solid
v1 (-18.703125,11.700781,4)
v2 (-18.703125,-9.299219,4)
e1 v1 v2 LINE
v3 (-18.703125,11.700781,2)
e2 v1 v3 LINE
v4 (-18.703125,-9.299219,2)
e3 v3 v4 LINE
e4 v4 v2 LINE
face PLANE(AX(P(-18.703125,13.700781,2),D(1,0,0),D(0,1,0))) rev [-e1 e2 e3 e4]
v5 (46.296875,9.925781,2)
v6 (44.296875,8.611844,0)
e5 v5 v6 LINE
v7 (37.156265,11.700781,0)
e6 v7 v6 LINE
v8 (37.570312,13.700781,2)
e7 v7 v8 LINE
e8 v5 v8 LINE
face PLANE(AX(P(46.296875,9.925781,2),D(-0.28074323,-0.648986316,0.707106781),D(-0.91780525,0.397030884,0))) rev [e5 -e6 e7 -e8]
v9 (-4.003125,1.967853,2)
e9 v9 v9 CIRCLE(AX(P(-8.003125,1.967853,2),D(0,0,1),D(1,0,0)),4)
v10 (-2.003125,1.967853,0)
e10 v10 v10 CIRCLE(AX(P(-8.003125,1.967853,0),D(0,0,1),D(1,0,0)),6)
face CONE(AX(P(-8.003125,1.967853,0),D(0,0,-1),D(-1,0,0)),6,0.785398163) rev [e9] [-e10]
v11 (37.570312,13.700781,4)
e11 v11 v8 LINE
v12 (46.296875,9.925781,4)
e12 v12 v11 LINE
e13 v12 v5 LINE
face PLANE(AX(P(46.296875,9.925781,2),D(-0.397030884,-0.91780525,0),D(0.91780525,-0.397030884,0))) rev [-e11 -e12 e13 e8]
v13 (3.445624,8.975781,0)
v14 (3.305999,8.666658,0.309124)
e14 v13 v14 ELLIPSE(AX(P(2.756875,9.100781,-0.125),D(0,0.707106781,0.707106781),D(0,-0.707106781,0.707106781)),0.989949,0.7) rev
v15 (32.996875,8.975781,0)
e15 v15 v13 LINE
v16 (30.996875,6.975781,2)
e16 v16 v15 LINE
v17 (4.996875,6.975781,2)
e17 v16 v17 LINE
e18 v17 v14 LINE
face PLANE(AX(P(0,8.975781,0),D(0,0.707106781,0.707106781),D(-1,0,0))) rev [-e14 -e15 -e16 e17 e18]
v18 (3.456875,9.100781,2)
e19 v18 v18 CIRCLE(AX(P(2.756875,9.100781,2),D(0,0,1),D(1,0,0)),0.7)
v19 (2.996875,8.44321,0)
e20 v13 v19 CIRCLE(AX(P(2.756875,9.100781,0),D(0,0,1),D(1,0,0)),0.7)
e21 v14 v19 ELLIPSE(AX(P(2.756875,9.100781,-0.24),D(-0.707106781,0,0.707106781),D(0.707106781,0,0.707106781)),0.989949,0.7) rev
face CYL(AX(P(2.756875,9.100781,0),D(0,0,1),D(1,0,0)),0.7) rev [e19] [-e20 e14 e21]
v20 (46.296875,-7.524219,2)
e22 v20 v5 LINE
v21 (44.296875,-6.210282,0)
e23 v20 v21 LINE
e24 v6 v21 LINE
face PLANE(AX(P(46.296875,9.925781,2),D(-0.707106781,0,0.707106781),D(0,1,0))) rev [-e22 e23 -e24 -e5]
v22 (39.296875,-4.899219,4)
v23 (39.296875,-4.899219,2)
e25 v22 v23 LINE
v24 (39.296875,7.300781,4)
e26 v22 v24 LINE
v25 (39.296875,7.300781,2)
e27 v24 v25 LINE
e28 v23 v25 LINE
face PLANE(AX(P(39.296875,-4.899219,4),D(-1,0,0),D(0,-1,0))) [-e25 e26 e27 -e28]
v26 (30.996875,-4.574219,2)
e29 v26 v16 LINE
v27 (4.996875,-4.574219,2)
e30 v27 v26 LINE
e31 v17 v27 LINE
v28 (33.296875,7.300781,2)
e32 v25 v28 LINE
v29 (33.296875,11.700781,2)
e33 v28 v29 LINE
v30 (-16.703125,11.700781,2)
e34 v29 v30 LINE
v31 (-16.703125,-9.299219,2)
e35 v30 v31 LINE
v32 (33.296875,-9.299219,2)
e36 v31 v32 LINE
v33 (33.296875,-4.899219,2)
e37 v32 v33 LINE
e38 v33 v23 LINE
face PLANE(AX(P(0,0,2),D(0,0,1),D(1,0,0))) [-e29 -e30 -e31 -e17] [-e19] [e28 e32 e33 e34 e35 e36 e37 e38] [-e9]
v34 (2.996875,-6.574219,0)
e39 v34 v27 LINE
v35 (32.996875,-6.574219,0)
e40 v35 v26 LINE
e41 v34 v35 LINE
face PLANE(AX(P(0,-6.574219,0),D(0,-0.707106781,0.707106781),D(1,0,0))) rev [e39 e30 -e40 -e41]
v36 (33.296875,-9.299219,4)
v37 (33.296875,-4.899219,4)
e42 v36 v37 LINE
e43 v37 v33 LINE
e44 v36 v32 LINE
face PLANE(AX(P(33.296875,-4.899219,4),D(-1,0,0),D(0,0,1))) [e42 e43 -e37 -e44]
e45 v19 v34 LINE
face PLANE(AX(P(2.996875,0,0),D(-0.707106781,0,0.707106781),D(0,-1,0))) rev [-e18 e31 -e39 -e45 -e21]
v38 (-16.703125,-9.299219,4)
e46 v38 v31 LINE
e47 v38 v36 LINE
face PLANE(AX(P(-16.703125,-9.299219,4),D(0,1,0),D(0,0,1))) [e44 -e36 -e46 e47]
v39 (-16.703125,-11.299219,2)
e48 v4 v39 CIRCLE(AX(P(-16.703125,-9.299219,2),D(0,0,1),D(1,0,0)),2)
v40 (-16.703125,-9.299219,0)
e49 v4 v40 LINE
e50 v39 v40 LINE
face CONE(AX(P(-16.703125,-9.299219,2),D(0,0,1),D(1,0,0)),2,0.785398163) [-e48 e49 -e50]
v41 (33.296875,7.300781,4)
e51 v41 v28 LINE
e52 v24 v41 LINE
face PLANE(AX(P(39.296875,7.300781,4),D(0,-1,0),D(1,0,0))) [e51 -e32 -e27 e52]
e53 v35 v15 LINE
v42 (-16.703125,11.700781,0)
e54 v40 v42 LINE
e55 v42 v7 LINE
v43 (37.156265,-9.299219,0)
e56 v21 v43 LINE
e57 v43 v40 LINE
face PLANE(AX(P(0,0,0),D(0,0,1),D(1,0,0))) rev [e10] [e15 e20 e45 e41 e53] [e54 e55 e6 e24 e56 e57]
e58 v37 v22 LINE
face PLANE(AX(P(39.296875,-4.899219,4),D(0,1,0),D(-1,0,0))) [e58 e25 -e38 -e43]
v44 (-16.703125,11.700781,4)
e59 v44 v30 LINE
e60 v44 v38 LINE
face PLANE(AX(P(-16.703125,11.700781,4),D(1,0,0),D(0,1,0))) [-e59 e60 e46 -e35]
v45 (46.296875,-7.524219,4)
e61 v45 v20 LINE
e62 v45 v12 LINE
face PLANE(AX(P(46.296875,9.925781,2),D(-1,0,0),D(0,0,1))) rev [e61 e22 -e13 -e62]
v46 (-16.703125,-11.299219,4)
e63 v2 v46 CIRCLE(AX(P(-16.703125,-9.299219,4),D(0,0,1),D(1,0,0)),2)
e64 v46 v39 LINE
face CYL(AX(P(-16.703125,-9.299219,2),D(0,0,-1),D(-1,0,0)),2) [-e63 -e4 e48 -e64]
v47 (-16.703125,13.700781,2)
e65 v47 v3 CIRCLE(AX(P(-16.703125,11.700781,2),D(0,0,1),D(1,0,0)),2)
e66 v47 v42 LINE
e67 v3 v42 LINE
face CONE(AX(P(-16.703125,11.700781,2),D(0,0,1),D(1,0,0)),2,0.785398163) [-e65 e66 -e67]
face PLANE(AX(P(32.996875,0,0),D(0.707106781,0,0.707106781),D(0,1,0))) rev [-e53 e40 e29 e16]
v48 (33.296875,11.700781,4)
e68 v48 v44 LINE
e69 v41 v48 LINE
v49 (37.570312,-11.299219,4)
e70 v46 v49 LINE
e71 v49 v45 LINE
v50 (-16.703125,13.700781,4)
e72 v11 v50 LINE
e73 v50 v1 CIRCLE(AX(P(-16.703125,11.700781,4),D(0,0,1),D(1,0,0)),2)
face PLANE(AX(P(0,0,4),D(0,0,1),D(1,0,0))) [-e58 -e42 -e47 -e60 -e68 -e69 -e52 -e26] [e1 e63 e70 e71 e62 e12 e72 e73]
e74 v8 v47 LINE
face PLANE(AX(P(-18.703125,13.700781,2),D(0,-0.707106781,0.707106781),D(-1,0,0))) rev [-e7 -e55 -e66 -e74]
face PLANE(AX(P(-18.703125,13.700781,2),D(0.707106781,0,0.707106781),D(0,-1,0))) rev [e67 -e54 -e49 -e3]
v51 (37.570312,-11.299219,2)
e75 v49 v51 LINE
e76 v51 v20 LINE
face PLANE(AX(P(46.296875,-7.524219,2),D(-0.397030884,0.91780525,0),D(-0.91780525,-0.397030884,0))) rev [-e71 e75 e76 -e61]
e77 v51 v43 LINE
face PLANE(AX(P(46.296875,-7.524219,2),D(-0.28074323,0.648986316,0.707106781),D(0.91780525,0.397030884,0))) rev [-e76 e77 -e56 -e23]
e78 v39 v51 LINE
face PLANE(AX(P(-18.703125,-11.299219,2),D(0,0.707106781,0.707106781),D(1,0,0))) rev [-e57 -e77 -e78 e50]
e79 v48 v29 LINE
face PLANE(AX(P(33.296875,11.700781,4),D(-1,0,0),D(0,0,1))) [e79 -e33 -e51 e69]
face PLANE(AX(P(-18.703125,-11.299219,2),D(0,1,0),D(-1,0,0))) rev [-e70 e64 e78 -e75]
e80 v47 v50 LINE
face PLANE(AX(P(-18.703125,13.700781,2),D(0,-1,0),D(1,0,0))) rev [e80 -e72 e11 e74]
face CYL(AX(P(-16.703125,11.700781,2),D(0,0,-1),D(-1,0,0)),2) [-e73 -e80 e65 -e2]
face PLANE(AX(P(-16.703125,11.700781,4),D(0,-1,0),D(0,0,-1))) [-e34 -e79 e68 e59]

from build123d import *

# Parameters (mm, degrees)
EXTRUDE_1_DEPTH     = 2
EXTRUDE_2_DEPTH     = 2
SKETCH_4_R          = 4
SKETCH_4_R_2        = 0.7
SKETCH_4_W          = 26
SKETCH_4_H          = 11.55
CUT_EXTRUDE_1_DEPTH = 49.322997027
CHAMFER_3_SIZE      = 2
FILLET_2_R          = 2
CHAMFER_4_SIZE      = 2


# Some blends are built 0.0001 mm under size
with BuildPart() as part:
    # Эскиз1 → Бобышка-Вытянуть1 (new body)
    with BuildSketch(Plane.XY):
        Polygon((46.296875, 9.92578125), (37.5703125, 13.70078125), (-18.703125, 13.70078125), (-18.703125, -11.29921875), (37.5703125, -11.29921875), (46.296875, -7.52421875), align=None)
    extrude(amount=EXTRUDE_1_DEPTH)

    # Эскиз2 → Бобышка-Вытянуть2 (add)
    with BuildSketch(Plane.XY.offset(2)):
        Polygon((-18.703125, -11.29921875), (37.5703125, -11.29921875), (46.296875, -7.52421875), (46.296875, 9.92578125), (37.5703125, 13.70078125), (-18.703125, 13.70078125), align=None)
        Polygon((-16.703125, 11.70078125), (33.296875, 11.70078125), (33.296875, 7.30078125), (39.296875, 7.30078125), (39.296875, -4.89921875), (33.296875, -4.89921875), (33.296875, -9.29921875), (-16.703125, -9.29921875), align=None, mode=Mode.SUBTRACT)
    extrude(amount=EXTRUDE_2_DEPTH)

    # Эскиз4 → Вырез-Вытянуть1 (cut, through all)
    with BuildSketch(Plane.XY.offset(2)):
        with Locations((-8.003125, 1.96785345)):
            Circle(SKETCH_4_R)
        with Locations((2.756875, 9.10078125)):
            Circle(SKETCH_4_R_2)
        with Locations((17.996875, 1.20078125)):
            Rectangle(SKETCH_4_W, SKETCH_4_H)
    extrude(amount=-CUT_EXTRUDE_1_DEPTH, mode=Mode.SUBTRACT)

    # Фаска3
    # the kernel refuses this chamfer: 2 mm, written as the material it takes off along each edge
    with BuildSketch(Plane(origin=(51.017483297, 7.883706112, 0), x_dir=(0.010916712185249174, 0.025235859914990173, 0.9996219169112968), z_dir=(-0.9178052503070296, 0.3970308835705994, 0))) as chamfer_3_piece_1:
        Polygon((CHAMFER_3_SIZE * 0.999621916911, -CHAMFER_3_SIZE * 0.0274958766106), (-CHAMFER_3_SIZE * 0.0274958766106, -CHAMFER_3_SIZE * 0.999621916911), (0, 0), align=None)
    extrude(amount=19.794808417, mode=Mode.SUBTRACT)
    with BuildSketch(Plane(origin=(46.296875, -12.667584726, 0), x_dir=(0.02749587661058563, 0, 0.9996219169112968), z_dir=(0, 1, 0))) as chamfer_3_piece_2:
        Polygon((CHAMFER_3_SIZE * 0.999621916911, -CHAMFER_3_SIZE * 0.0274958766106), (-CHAMFER_3_SIZE * 0.0274958766106, -CHAMFER_3_SIZE * 0.999621916911), (0, 0), align=None)
    extrude(amount=27.736731952, mode=Mode.SUBTRACT)
    with BuildSketch(Plane(origin=(32.849704203, -13.341293888, 0), x_dir=(-0.3968807729078274, 0.9174582436631658, -0.027495876610586396), z_dir=(0.91780525030703, 0.3970308835705984, 0))) as chamfer_3_piece_3:
        Polygon((CHAMFER_3_SIZE * 0.999621916911, CHAMFER_3_SIZE * 0.0274958766106), (-CHAMFER_3_SIZE * 0.0274958766106, CHAMFER_3_SIZE * 0.999621916911), (0, 0), align=None)
    extrude(amount=19.794808417, mode=Mode.SUBTRACT)
    with BuildSketch(Plane(origin=(-8.003125, 1.96785345, 0), x_dir=(1, 0, 0), z_dir=(0, -1, 0))) as chamfer_3_piece_4:
        Polygon((4 + CHAMFER_3_SIZE, 0), (4, CHAMFER_3_SIZE), (4, 0), align=None)
    revolve(axis=Axis((-8.003125, 1.96785345, 0), (0, 0, 1)), mode=Mode.SUBTRACT)
    with BuildSketch(Plane(origin=(30.996875, 6.97578125, 0), x_dir=(0.9996219169112968, 0, -0.02749587661058632), z_dir=(0, -1, 0)), Plane(origin=(4.996875, -4.57421875, 0), x_dir=(-0.9996219169112968, 0, -0.027495876610586372), z_dir=(0, 1, 0))) as chamfer_3_piece_5:
        Polygon((CHAMFER_3_SIZE * 0.999621916911, CHAMFER_3_SIZE * 0.0274958766106), (-CHAMFER_3_SIZE * 0.0274958766106, CHAMFER_3_SIZE * 0.999621916911), (0, 0), align=None)
    extrude(amount=11.55, mode=Mode.SUBTRACT)
    with BuildSketch(Plane(origin=(30.996875, -4.57421875, 0), x_dir=(0, -0.9996219169112968, -0.027495876610586365), z_dir=(-1, 0, 0)), Plane(origin=(4.996875, 6.97578125, 0), x_dir=(0, 0.9996219169112968, -0.027495876610586348), z_dir=(1, 0, 0))) as chamfer_3_piece_6:
        Polygon((CHAMFER_3_SIZE * 0.999621916911, CHAMFER_3_SIZE * 0.0274958766106), (-CHAMFER_3_SIZE * 0.0274958766106, CHAMFER_3_SIZE * 0.999621916911), (0, 0), align=None)
    extrude(amount=26, mode=Mode.SUBTRACT)
    with BuildSketch(Plane(origin=(30.996875, 12.119147226, 0), x_dir=(0.9996219169112968, 0, -0.02749587661058632), z_dir=(0, -1, 0))) as chamfer_3_piece_7a_section:
        Polygon((CHAMFER_3_SIZE * 0.999621916911, CHAMFER_3_SIZE * 0.0274958766106), (-CHAMFER_3_SIZE * 0.0274958766106, CHAMFER_3_SIZE * 0.999621916911), (0, 0), align=None)
    chamfer_3_piece_7a = extrude(amount=16.693365976, mode=Mode.PRIVATE)
    chamfer_3_piece_7a = split(chamfer_3_piece_7a, bisect_by=Plane(origin=(31.656462254, 6.97578125, 0.659587254), z_dir=(0, 1, 0)), keep=Keep.TOP, mode=Mode.PRIVATE)
    with BuildSketch(Plane(origin=(4.996875, 6.97578125, 0), x_dir=(0, 0.9996219169112968, -0.027495876610586348), z_dir=(1, 0, 0))) as chamfer_3_piece_7b_section:
        Polygon((CHAMFER_3_SIZE * 0.999621916911, CHAMFER_3_SIZE * 0.0274958766106), (-CHAMFER_3_SIZE * 0.0274958766106, CHAMFER_3_SIZE * 0.999621916911), (0, 0), align=None)
    chamfer_3_piece_7b = extrude(amount=31.143365976, mode=Mode.PRIVATE)
    chamfer_3_piece_7b = split(chamfer_3_piece_7b, bisect_by=Plane(origin=(30.996875, 7.635368504, 0.659587254), z_dir=(1, 0, 0)), keep=Keep.TOP, mode=Mode.PRIVATE)
    chamfer_3_piece_7 = chamfer_3_piece_7a & chamfer_3_piece_7b
    add(chamfer_3_piece_7, mode=Mode.SUBTRACT)
    with BuildSketch(Plane(origin=(36.140240976, -4.57421875, 0), x_dir=(0, -0.9996219169112968, -0.027495876610586365), z_dir=(-1, 0, 0))) as chamfer_3_piece_8a_section:
        Polygon((CHAMFER_3_SIZE * 0.999621916911, CHAMFER_3_SIZE * 0.0274958766106), (-CHAMFER_3_SIZE * 0.0274958766106, CHAMFER_3_SIZE * 0.999621916911), (0, 0), align=None)
    chamfer_3_piece_8a = extrude(amount=31.143365976, mode=Mode.PRIVATE)
    chamfer_3_piece_8a = split(chamfer_3_piece_8a, bisect_by=Plane(origin=(30.996875, -5.233806004, 0.659587254), z_dir=(1, 0, 0)), keep=Keep.TOP, mode=Mode.PRIVATE)
    with BuildSketch(Plane(origin=(30.996875, 6.97578125, 0), x_dir=(0.9996219169112968, 0, -0.02749587661058632), z_dir=(0, -1, 0))) as chamfer_3_piece_8b_section:
        Polygon((CHAMFER_3_SIZE * 0.999621916911, CHAMFER_3_SIZE * 0.0274958766106), (-CHAMFER_3_SIZE * 0.0274958766106, CHAMFER_3_SIZE * 0.999621916911), (0, 0), align=None)
    chamfer_3_piece_8b = extrude(amount=16.693365976, mode=Mode.PRIVATE)
    chamfer_3_piece_8b = split(chamfer_3_piece_8b, bisect_by=Plane(origin=(31.656462254, -4.57421875, 0.659587254), z_dir=(0, -1, 0)), keep=Keep.TOP, mode=Mode.PRIVATE)
    chamfer_3_piece_8 = chamfer_3_piece_8a & chamfer_3_piece_8b
    add(chamfer_3_piece_8, mode=Mode.SUBTRACT)
    with BuildSketch(Plane(origin=(4.996875, -9.717584726, 0), x_dir=(-0.9996219169112968, 0, -0.027495876610586355), z_dir=(0, 1, 0))) as chamfer_3_piece_9a_section:
        Polygon((CHAMFER_3_SIZE * 0.999621916911, CHAMFER_3_SIZE * 0.0274958766106), (-CHAMFER_3_SIZE * 0.0274958766106, CHAMFER_3_SIZE * 0.999621916911), (0, 0), align=None)
    chamfer_3_piece_9a = extrude(amount=16.693365976, mode=Mode.PRIVATE)
    chamfer_3_piece_9a = split(chamfer_3_piece_9a, bisect_by=Plane(origin=(4.337287746, -4.57421875, 0.659587254), z_dir=(0, -1, 0)), keep=Keep.TOP, mode=Mode.PRIVATE)
    with BuildSketch(Plane(origin=(30.996875, -4.57421875, 0), x_dir=(0, -0.9996219169112968, -0.027495876610586365), z_dir=(-1, 0, 0))) as chamfer_3_piece_9b_section:
        Polygon((CHAMFER_3_SIZE * 0.999621916911, CHAMFER_3_SIZE * 0.0274958766106), (-CHAMFER_3_SIZE * 0.0274958766106, CHAMFER_3_SIZE * 0.999621916911), (0, 0), align=None)
    chamfer_3_piece_9b = extrude(amount=31.143365976, mode=Mode.PRIVATE)
    chamfer_3_piece_9b = split(chamfer_3_piece_9b, bisect_by=Plane(origin=(4.996875, -5.233806004, 0.659587254), z_dir=(-1, 0, 0)), keep=Keep.TOP, mode=Mode.PRIVATE)
    chamfer_3_piece_9 = chamfer_3_piece_9a & chamfer_3_piece_9b
    add(chamfer_3_piece_9, mode=Mode.SUBTRACT)
    with BuildSketch(Plane(origin=(4.996875, -4.57421875, 0), x_dir=(-0.9996219169112968, 0, -0.027495876610586372), z_dir=(0, 1, 0))) as chamfer_3_piece_10a_section:
        Polygon((CHAMFER_3_SIZE * 0.999621916911, CHAMFER_3_SIZE * 0.0274958766106), (-CHAMFER_3_SIZE * 0.0274958766106, CHAMFER_3_SIZE * 0.999621916911), (0, 0), align=None)
    chamfer_3_piece_10a = extrude(amount=16.693365976, mode=Mode.PRIVATE)
    chamfer_3_piece_10a = split(chamfer_3_piece_10a, bisect_by=Plane(origin=(4.337287746, 6.97578125, 0.659587254), z_dir=(0, 1, 0)), keep=Keep.TOP, mode=Mode.PRIVATE)
    with BuildSketch(Plane(origin=(-0.146490976, 6.97578125, 0), x_dir=(0, 0.9996219169112968, -0.027495876610586348), z_dir=(1, 0, 0))) as chamfer_3_piece_10b_section:
        Polygon((CHAMFER_3_SIZE * 0.999621916911, CHAMFER_3_SIZE * 0.0274958766106), (-CHAMFER_3_SIZE * 0.0274958766106, CHAMFER_3_SIZE * 0.999621916911), (0, 0), align=None)
    chamfer_3_piece_10b = extrude(amount=31.143365976, mode=Mode.PRIVATE)
    chamfer_3_piece_10b = split(chamfer_3_piece_10b, bisect_by=Plane(origin=(4.996875, 7.635368504, 0.659587254), z_dir=(-1, 0, 0)), keep=Keep.TOP, mode=Mode.PRIVATE)
    chamfer_3_piece_10 = chamfer_3_piece_10a & chamfer_3_piece_10b
    add(chamfer_3_piece_10, mode=Mode.SUBTRACT)

    # Скругление2
    fillet_2_edges = [part.edges().sort_by_distance(p)[0] for p in [
        (-18.703125, 13.70078125, 2),
        (-18.703125, -11.29921875, 2),
    ]]
    fillet(fillet_2_edges, radius=FILLET_2_R)

    # Фаска4
    chamfer_4_edges = [part.edges().sort_by_distance(p)[0] for p in [
        (7.914897998, -11.29921875, 0),
        (-18.117338562, -10.713432312, 0),
        (-18.703125, 1.20078125, 0),
        (-18.117338562, 13.114994812, 0),
        (7.914897998, 13.70078125, 0),
    ]]
    chamfer(chamfer_4_edges, length=CHAMFER_4_SIZE - 0.0001)  # a hair under: the kernel refuses the full size


solid = part.part
